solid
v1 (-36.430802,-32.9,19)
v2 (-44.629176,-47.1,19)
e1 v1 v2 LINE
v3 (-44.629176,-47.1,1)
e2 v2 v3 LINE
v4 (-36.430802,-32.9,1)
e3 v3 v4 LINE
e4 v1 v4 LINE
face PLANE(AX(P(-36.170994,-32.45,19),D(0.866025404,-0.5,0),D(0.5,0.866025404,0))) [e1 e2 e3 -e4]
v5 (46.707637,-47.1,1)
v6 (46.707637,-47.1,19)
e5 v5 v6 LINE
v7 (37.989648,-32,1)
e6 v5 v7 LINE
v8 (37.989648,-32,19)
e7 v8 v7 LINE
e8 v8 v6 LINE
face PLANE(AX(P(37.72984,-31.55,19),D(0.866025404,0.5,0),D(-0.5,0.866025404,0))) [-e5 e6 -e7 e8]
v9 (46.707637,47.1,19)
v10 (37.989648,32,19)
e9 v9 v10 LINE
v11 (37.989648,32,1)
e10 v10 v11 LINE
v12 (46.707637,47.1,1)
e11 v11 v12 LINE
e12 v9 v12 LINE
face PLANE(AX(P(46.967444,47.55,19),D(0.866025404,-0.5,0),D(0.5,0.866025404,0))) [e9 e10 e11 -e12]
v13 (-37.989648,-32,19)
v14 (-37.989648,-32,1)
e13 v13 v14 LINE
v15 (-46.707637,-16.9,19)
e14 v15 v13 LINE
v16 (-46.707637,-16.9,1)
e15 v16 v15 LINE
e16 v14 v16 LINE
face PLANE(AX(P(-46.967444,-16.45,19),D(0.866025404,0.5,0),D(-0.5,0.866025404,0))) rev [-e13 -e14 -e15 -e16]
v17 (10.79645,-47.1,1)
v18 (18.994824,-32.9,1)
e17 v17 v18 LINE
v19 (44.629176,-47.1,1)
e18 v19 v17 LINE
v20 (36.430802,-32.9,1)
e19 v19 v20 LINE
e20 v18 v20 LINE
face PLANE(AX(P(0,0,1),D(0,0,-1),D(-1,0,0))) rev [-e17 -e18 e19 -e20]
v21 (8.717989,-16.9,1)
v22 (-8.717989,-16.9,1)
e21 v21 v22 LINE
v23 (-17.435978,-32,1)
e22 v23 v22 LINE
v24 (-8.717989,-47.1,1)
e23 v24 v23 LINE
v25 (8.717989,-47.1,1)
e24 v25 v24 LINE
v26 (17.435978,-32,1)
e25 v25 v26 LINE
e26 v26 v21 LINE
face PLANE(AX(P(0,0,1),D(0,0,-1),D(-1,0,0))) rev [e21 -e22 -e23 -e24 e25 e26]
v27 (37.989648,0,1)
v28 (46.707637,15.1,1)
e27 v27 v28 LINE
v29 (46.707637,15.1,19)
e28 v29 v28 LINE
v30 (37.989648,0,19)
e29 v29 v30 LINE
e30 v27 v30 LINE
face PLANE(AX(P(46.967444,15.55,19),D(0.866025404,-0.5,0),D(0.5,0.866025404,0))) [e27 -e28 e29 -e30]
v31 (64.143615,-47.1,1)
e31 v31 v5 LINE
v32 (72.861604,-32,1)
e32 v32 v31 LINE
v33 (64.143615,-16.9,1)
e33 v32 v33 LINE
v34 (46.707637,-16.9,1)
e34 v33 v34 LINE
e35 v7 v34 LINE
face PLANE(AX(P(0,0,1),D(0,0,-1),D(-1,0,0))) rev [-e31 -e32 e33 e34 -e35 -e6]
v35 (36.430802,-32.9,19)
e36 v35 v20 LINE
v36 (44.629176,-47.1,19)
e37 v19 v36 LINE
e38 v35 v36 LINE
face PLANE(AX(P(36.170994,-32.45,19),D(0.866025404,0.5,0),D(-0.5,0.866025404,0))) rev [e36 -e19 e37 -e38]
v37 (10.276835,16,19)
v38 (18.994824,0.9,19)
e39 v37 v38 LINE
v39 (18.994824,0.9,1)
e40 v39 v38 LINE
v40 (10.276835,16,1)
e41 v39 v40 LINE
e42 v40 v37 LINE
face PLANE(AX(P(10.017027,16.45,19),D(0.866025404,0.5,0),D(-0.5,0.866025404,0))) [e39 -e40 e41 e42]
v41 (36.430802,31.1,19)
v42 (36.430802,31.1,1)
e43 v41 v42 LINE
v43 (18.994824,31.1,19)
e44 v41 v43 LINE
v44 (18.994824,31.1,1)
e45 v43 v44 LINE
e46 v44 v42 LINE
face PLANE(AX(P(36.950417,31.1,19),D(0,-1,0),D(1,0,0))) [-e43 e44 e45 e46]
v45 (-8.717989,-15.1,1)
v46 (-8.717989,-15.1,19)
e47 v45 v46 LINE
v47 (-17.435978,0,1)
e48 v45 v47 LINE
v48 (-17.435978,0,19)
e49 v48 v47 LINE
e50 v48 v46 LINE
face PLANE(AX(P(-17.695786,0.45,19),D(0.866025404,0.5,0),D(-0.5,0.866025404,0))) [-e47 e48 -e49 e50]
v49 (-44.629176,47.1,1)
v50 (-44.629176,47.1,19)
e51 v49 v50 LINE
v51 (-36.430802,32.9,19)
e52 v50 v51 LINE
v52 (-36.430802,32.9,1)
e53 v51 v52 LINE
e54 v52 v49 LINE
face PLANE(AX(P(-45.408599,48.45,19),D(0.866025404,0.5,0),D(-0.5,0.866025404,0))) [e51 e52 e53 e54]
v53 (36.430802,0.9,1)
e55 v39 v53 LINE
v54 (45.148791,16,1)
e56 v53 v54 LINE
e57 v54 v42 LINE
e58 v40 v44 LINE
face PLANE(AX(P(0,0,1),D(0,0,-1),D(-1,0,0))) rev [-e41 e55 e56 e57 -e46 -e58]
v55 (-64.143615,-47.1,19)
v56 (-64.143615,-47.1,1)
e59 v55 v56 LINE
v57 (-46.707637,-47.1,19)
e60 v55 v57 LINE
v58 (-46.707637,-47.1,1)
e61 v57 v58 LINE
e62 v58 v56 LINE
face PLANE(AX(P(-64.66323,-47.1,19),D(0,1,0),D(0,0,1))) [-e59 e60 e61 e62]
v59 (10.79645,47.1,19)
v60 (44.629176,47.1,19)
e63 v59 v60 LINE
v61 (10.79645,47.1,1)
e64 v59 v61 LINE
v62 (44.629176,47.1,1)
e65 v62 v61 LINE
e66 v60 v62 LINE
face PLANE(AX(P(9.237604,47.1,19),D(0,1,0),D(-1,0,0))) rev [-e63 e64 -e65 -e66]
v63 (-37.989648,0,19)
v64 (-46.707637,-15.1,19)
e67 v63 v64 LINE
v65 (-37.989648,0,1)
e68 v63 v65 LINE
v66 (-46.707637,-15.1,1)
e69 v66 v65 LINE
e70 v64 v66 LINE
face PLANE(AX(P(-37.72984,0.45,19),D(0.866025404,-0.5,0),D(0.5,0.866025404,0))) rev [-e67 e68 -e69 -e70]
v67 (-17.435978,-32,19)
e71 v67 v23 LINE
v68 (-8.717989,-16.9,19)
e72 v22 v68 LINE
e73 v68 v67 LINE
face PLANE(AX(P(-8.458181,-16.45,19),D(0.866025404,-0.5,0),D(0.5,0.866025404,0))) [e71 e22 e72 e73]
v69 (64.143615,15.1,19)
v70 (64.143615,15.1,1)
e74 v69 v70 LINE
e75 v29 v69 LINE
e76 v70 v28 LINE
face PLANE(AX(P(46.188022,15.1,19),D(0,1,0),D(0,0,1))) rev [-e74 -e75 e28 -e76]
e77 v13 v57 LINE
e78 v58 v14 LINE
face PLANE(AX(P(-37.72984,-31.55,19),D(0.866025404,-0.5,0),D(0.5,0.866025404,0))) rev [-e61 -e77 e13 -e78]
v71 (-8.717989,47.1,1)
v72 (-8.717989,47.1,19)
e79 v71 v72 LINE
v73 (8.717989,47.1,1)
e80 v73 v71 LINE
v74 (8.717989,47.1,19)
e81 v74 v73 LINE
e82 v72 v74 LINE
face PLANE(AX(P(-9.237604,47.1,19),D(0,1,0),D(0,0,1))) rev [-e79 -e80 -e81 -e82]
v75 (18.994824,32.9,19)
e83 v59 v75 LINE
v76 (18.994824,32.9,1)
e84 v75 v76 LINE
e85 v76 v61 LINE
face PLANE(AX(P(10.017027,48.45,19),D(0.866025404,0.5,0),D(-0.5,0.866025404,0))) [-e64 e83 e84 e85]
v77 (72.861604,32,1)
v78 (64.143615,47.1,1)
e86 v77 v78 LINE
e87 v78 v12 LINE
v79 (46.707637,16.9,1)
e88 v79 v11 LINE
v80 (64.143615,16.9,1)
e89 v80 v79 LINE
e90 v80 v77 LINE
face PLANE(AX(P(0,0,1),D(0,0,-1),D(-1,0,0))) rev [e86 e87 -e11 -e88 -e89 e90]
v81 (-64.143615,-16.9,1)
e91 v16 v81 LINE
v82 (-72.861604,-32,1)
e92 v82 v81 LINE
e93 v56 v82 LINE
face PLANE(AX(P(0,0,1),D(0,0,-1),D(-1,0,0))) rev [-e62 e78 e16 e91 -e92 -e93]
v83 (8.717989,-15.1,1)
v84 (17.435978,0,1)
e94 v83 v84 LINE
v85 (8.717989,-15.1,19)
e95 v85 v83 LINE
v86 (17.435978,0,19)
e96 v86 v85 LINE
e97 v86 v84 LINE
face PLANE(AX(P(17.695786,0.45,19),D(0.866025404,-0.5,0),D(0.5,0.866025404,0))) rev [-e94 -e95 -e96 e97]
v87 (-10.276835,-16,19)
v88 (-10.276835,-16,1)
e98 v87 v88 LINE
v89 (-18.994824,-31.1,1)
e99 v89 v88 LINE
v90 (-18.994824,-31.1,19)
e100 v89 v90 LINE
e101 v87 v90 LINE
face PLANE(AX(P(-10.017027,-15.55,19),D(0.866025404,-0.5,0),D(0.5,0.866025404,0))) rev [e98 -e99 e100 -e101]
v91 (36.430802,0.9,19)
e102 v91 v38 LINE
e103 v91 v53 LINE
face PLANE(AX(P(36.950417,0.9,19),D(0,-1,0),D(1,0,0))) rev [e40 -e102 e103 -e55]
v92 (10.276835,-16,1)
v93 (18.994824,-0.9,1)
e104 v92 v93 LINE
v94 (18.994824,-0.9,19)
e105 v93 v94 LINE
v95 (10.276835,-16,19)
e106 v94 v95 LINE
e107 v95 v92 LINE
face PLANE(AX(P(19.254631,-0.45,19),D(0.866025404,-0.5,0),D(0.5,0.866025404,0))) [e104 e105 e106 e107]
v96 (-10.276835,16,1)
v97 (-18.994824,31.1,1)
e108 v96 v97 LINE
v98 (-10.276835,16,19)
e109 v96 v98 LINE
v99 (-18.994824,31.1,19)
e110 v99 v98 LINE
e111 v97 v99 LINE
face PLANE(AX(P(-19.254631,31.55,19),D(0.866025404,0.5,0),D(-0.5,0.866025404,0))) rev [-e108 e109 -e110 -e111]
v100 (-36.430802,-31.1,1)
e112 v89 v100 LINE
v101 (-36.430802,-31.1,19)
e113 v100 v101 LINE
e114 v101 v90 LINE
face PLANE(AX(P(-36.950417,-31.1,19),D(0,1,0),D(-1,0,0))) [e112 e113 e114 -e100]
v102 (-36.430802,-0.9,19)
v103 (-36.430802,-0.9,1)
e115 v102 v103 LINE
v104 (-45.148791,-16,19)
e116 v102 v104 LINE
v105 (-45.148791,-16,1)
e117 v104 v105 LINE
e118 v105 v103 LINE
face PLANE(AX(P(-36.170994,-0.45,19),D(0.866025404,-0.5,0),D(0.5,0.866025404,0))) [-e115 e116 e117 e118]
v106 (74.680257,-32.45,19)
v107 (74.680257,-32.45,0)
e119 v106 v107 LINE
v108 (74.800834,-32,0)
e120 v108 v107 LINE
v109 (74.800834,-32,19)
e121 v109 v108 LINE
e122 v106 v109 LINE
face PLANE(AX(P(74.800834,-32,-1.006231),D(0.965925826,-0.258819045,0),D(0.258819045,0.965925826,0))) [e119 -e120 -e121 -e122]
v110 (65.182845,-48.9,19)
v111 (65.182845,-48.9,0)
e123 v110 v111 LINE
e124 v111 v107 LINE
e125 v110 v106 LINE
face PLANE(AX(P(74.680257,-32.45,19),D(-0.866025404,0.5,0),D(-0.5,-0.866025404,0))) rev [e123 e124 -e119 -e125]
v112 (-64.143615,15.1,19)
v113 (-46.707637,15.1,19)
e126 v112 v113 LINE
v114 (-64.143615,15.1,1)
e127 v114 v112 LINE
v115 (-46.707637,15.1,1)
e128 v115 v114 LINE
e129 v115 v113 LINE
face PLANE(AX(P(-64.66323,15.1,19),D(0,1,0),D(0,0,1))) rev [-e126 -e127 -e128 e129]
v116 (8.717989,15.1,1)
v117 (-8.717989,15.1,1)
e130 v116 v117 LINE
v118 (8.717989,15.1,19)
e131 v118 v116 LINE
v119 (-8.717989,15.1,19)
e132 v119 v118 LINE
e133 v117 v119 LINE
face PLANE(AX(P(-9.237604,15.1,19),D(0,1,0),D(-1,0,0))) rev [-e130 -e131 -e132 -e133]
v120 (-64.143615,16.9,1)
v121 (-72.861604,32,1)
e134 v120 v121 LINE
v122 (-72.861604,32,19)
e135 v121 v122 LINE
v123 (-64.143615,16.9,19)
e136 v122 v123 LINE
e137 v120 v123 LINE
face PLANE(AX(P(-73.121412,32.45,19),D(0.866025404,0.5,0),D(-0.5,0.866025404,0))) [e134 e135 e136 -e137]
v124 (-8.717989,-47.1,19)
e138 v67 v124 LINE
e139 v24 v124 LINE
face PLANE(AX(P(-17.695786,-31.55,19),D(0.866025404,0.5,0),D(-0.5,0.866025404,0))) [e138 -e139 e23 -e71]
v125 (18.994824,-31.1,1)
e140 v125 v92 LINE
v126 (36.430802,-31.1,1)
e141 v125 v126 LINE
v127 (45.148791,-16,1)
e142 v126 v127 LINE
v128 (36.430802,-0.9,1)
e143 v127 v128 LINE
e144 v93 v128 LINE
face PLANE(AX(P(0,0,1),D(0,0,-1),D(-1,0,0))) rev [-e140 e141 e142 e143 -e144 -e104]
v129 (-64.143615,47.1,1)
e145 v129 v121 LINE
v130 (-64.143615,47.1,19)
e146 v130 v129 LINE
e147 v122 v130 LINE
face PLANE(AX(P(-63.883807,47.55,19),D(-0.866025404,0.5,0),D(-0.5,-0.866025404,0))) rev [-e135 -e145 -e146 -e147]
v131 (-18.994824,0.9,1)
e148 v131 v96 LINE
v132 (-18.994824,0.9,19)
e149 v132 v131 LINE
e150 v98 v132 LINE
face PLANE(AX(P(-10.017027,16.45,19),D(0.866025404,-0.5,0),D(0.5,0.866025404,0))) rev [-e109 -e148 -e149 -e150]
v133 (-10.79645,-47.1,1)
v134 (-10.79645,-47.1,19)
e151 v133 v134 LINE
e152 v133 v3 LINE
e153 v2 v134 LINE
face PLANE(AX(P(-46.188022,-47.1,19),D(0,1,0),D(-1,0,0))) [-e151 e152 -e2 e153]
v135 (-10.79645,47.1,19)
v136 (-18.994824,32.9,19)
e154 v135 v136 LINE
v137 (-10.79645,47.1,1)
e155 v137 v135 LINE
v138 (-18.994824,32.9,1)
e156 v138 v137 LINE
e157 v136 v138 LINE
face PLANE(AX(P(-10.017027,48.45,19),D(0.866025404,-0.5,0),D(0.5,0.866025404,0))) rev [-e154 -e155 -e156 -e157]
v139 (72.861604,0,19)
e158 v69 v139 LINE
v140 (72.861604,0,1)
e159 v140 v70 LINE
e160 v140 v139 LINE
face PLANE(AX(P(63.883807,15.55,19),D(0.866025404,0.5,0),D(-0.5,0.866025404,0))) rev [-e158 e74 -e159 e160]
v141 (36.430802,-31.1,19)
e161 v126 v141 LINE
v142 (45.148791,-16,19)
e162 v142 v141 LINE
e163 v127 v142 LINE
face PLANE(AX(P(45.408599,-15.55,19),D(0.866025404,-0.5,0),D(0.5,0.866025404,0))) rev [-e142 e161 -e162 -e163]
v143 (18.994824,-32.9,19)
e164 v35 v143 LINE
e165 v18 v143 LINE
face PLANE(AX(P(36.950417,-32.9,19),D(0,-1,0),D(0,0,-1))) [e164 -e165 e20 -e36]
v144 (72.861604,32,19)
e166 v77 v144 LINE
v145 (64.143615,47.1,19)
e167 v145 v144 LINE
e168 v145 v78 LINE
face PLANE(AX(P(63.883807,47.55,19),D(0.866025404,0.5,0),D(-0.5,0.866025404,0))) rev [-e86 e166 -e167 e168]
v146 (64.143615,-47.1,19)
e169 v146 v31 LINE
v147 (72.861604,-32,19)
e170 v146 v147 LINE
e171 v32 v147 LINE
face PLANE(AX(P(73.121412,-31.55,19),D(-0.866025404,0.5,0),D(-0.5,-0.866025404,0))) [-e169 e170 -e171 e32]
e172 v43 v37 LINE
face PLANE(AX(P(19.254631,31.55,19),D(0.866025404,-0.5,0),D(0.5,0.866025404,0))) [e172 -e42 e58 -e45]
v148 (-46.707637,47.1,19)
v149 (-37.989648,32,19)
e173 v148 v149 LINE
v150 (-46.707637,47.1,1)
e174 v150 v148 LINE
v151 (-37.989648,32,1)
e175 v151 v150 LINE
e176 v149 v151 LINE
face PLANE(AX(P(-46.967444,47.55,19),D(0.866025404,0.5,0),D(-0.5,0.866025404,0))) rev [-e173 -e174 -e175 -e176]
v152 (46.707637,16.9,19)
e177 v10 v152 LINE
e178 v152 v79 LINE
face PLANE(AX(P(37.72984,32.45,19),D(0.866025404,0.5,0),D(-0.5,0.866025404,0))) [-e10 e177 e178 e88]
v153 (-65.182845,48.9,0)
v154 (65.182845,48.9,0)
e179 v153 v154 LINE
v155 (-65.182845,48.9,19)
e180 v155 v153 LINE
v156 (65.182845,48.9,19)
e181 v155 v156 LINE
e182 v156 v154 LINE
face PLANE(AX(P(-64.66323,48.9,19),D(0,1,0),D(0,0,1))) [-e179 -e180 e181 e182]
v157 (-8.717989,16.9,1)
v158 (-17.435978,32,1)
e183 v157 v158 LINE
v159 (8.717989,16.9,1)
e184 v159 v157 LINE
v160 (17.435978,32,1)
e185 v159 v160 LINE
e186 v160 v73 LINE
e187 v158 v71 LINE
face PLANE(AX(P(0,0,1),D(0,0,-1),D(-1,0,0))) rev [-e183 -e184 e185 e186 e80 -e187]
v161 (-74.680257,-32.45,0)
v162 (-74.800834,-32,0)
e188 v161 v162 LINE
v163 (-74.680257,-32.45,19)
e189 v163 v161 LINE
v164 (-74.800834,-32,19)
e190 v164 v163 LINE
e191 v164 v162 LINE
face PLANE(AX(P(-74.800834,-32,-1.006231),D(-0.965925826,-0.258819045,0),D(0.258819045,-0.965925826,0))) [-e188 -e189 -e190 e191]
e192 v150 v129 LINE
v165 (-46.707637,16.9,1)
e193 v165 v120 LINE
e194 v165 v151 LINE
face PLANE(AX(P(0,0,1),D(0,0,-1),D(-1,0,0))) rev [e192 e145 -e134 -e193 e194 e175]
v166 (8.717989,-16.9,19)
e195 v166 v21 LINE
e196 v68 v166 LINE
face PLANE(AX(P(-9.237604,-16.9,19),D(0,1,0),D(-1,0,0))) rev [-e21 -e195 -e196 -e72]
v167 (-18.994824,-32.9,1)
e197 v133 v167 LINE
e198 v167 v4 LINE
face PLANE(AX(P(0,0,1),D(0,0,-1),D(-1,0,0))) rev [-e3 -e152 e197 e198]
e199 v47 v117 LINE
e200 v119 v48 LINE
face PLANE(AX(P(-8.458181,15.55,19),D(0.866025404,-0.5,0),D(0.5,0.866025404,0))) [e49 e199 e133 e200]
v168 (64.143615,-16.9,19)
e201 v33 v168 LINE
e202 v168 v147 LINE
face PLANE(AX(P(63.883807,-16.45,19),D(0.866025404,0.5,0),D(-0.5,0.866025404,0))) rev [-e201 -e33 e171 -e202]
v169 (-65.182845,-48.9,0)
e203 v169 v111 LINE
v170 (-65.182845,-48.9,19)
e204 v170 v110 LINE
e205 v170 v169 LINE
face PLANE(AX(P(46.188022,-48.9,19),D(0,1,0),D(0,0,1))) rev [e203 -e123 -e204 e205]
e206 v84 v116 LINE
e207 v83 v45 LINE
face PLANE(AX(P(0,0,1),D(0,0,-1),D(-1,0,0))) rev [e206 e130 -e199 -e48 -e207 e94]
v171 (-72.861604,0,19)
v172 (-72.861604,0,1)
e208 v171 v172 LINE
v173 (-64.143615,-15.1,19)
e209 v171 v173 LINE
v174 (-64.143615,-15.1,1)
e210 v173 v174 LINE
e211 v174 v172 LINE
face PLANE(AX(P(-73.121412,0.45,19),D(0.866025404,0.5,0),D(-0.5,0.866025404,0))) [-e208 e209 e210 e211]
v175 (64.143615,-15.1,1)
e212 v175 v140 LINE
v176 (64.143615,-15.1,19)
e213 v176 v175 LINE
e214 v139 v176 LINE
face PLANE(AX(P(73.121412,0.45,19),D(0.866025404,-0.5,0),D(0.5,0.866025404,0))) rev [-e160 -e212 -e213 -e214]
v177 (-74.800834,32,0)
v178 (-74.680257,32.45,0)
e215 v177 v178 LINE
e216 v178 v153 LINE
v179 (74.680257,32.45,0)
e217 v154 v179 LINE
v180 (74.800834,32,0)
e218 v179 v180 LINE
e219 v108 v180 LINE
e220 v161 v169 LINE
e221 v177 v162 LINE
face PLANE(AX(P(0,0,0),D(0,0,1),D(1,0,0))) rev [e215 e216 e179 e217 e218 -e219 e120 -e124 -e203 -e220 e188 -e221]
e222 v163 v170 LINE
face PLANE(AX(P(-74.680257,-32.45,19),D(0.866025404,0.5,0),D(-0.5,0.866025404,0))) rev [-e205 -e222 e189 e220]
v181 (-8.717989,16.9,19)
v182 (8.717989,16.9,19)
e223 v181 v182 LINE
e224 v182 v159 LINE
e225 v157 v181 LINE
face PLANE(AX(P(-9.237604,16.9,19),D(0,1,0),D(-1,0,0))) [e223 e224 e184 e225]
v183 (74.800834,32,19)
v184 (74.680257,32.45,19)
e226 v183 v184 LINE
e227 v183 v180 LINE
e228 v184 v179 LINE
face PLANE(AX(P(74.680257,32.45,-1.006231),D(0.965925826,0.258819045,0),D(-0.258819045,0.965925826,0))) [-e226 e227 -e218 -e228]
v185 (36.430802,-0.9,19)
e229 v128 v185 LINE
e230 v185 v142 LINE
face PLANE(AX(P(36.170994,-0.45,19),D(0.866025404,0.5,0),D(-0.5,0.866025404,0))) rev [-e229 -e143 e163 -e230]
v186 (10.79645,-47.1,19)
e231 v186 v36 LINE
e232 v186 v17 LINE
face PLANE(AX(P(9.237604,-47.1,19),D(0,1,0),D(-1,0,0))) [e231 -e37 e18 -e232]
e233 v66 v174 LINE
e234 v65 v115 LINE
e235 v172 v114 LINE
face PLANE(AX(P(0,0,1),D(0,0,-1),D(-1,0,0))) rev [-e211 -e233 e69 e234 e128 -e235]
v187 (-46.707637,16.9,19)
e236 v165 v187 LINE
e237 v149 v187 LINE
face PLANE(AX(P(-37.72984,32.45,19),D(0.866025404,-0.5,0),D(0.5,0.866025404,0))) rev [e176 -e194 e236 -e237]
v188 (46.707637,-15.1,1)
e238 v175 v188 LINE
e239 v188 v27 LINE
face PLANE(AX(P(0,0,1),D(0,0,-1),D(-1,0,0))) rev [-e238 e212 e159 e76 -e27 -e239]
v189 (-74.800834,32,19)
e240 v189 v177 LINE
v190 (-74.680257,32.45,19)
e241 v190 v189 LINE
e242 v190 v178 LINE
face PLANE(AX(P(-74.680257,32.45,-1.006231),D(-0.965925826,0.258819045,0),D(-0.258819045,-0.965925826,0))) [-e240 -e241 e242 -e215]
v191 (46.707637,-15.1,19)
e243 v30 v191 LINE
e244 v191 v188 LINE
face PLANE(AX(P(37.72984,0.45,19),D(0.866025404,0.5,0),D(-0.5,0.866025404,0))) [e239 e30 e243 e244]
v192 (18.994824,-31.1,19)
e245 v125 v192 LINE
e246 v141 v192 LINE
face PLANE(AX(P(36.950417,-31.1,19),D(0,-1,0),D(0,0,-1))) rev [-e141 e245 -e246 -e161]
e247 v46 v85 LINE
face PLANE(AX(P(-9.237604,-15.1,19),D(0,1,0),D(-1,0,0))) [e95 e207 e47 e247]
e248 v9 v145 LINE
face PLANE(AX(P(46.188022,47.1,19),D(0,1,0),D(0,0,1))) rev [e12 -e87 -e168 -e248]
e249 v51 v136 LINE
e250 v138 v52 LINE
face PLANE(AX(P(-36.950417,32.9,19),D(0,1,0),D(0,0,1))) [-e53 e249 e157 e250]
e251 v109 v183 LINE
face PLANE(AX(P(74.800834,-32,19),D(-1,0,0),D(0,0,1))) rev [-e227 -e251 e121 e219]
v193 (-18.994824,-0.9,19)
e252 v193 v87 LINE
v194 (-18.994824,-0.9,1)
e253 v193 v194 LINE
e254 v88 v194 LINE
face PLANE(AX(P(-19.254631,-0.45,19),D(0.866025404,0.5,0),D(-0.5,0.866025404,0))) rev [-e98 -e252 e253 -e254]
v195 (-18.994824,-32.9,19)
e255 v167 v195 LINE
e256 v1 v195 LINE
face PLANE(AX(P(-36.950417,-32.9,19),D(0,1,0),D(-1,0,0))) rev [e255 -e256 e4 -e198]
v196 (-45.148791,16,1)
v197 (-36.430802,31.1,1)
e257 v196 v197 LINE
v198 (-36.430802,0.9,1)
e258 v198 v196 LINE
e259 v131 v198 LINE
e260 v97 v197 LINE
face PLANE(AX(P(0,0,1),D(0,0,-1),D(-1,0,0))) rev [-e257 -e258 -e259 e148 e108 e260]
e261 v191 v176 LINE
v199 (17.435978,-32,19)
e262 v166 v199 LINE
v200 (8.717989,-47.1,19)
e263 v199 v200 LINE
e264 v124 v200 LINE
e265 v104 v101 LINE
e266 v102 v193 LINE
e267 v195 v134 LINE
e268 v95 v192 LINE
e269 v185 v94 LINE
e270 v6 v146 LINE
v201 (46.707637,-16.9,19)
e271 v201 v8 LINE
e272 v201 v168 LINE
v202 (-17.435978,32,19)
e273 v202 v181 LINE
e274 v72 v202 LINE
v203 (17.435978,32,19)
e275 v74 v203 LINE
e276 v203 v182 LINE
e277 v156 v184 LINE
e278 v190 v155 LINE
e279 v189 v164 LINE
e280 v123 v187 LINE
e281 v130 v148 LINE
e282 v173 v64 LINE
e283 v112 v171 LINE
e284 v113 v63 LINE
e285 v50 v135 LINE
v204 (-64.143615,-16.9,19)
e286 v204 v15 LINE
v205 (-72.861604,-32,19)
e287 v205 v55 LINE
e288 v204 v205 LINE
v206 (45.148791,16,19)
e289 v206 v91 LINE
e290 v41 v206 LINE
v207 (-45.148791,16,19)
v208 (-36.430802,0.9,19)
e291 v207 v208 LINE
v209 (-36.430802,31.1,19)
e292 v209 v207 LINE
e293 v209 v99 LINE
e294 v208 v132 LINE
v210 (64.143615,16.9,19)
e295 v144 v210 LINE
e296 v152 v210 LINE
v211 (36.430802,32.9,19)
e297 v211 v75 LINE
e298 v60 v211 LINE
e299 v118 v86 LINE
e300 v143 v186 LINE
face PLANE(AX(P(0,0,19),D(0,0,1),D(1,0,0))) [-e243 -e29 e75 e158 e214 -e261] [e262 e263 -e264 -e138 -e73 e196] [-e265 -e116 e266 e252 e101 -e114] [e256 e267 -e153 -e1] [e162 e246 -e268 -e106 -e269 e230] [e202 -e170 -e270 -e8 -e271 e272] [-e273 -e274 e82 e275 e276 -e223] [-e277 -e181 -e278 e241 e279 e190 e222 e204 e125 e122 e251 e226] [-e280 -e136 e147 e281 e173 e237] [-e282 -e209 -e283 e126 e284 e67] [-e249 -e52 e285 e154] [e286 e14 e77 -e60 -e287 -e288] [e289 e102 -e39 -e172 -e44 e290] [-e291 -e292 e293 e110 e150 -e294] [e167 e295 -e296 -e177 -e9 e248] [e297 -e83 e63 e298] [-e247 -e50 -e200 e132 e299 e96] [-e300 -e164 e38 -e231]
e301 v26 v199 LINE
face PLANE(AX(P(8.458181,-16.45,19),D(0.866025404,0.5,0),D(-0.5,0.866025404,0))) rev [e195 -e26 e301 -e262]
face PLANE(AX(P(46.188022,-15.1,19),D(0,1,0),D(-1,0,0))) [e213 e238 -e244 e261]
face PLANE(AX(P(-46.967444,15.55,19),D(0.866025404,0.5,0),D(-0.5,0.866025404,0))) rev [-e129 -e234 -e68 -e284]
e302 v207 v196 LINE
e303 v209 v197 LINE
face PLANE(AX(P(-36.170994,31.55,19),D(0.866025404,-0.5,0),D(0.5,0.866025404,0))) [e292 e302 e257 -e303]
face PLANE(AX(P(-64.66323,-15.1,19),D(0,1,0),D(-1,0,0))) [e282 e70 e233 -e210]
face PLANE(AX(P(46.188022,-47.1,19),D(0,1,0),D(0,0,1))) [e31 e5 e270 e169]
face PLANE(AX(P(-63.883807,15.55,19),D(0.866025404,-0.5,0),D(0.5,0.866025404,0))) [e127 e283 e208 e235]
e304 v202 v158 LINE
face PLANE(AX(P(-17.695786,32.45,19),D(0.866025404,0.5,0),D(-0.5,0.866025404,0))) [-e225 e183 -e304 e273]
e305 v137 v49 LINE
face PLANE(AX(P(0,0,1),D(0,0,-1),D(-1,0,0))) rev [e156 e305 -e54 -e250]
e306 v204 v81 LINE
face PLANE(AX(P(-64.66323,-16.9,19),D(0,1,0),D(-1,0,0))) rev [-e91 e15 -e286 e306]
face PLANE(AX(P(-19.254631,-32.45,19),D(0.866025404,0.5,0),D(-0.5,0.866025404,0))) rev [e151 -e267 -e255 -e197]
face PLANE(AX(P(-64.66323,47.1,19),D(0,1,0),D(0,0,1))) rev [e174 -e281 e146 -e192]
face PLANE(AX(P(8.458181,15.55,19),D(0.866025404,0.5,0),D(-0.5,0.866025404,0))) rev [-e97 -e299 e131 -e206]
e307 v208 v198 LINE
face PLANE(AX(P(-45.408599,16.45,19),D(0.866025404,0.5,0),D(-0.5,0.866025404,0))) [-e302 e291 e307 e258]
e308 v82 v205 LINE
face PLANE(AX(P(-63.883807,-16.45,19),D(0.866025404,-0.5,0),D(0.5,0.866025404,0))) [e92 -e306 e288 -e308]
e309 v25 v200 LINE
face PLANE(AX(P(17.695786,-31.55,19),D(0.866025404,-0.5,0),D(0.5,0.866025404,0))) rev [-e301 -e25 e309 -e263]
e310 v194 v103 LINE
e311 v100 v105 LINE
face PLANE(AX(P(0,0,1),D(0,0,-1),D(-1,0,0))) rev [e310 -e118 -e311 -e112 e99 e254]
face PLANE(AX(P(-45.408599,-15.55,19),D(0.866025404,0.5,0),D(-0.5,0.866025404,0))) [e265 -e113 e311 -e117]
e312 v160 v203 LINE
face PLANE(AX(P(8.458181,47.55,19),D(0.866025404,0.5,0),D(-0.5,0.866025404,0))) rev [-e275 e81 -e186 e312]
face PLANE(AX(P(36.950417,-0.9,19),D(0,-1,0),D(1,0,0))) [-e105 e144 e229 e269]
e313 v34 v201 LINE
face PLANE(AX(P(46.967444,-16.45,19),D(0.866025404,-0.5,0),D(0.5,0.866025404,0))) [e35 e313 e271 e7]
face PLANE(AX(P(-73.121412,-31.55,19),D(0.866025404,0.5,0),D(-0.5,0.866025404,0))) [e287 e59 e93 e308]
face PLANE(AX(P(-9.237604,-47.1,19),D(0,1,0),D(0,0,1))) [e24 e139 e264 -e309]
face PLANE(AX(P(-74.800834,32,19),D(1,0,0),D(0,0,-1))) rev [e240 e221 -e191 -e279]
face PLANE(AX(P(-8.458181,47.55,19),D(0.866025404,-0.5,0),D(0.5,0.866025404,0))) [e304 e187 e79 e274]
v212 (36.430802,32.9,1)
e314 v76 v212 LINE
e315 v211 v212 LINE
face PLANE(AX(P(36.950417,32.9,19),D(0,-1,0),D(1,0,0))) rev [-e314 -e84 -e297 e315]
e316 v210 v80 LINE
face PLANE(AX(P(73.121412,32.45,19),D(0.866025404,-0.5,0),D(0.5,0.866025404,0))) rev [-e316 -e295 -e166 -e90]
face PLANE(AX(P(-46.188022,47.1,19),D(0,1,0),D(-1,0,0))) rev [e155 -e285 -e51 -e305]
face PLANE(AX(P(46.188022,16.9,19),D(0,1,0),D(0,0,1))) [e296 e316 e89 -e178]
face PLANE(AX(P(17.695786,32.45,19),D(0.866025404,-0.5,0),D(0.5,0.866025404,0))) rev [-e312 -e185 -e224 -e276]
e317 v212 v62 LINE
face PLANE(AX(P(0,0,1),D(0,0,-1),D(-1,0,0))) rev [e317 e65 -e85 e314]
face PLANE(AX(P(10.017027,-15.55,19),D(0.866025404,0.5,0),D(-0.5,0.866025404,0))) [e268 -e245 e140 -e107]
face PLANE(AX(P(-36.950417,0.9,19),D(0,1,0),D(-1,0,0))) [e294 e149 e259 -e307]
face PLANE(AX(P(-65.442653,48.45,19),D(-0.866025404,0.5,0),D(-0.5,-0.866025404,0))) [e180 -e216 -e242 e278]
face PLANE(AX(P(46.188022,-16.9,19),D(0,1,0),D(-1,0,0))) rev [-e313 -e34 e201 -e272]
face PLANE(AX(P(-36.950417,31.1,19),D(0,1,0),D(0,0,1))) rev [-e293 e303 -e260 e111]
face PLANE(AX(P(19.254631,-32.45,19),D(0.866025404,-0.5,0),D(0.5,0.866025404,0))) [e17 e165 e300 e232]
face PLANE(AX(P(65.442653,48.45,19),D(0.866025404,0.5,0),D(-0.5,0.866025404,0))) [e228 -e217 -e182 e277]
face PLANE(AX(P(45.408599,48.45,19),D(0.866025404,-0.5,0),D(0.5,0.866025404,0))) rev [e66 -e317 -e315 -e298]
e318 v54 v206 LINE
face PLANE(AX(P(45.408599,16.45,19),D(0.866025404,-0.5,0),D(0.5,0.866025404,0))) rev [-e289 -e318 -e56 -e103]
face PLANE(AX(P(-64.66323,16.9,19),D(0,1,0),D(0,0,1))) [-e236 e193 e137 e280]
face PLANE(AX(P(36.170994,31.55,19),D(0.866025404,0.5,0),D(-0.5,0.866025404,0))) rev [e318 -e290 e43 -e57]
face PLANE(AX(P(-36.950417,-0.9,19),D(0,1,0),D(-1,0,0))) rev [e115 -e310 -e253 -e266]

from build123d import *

# Parameters (mm, degrees)
EXTRUDE_THIN2_DEPTH = 19
BOSS_EXTRUDE1_DEPTH = 19
BOSS_EXTRUDE2_DEPTH = 1
BOSS_EXTRUDE4_DEPTH = 18


# Read off the part's stored shape, not the designer's step: Extrude-Thin2
with BuildPart() as part:
    # Extrude-Thin2 outline → Extrude-Thin2 (new body)
    with BuildSketch(Plane.XY):
        Polygon((-74.68025732, 32.45), (-73.900834456, 32), (-74.800834456, 32), (-74.800834456, -32), (-73.900834456, -32), (-74.68025732, -32.45), (-65.182845391, -48.9), (65.182845392, -48.9), (74.68025732, -32.45), (73.900834456, -32), (74.800834456, -32), (74.800834456, 32), (73.900834456, 32), (74.68025732, 32.45), (65.182845392, 48.9), (-65.182845392, 48.9), align=None)
        Polygon((-37.989647713, -32), (-46.707636777, -47.1), (-64.143614907, -47.1), (-72.861603972, -32), (-64.143614907, -16.9), (-46.707636777, -16.9), align=None, mode=Mode.SUBTRACT)
        Polygon((-36.430801986, -32.9), (-18.994823856, -32.9), (-10.796450034, -47.1), (-44.629175808, -47.1), align=None, mode=Mode.SUBTRACT)
        Polygon((-73.000834456, -3.358845727), (-65.702460634, -16), (-73.000834456, -28.641154273), align=None, mode=Mode.SUBTRACT)
        Polygon((-10.276834792, -16), (-18.994823856, -31.1), (-36.430801986, -31.1), (-45.148791051, -16), (-36.430801986, -0.9), (-18.994823856, -0.9), align=None, mode=Mode.SUBTRACT)
        Polygon((10.796450034, -47.1), (18.994823856, -32.9), (36.430801986, -32.9), (44.629175808, -47.1), align=None, mode=Mode.SUBTRACT)
        Polygon((-8.717989065, -16.9), (8.717989065, -16.9), (17.43597813, -32), (8.717989065, -47.1), (-8.717989065, -47.1), (-17.435978129, -32), align=None, mode=Mode.SUBTRACT)
        Polygon((46.707636777, -16.9), (64.143614907, -16.9), (72.861603972, -32), (64.143614907, -47.1), (46.707636777, -47.1), (37.989647713, -32), align=None, mode=Mode.SUBTRACT)
        Polygon((36.430801986, -0.9), (45.148791051, -16), (36.430801986, -31.1), (18.994823856, -31.1), (10.276834792, -16), (18.994823856, -0.9), align=None, mode=Mode.SUBTRACT)
        Polygon((73.000834456, -28.641154273), (65.702460634, -16), (73.000834456, -3.358845727), align=None, mode=Mode.SUBTRACT)
        Polygon((-37.989647713, 0), (-46.707636777, -15.1), (-64.143614907, -15.1), (-72.861603972, 0), (-64.143614907, 15.1), (-46.707636777, 15.1), align=None, mode=Mode.SUBTRACT)
        Polygon((-65.702460634, 16), (-73.000834456, 3.358845727), (-73.000834456, 28.641154273), align=None, mode=Mode.SUBTRACT)
        Polygon((-10.276834792, 16), (-18.994823856, 0.9), (-36.430801986, 0.9), (-45.148791051, 16), (-36.430801986, 31.1), (-18.994823856, 31.1), align=None, mode=Mode.SUBTRACT)
        Polygon((-37.989647713, 32), (-46.707636777, 16.9), (-64.143614907, 16.9), (-72.861603972, 32), (-64.143614907, 47.1), (-46.707636777, 47.1), align=None, mode=Mode.SUBTRACT)
        Polygon((-10.796450034, 47.1), (-18.994823856, 32.9), (-36.430801986, 32.9), (-44.629175808, 47.1), align=None, mode=Mode.SUBTRACT)
        Polygon((17.43597813, 0), (8.717989065, -15.1), (-8.717989065, -15.1), (-17.43597813, 0), (-8.717989065, 15.1), (8.717989065, 15.1), align=None, mode=Mode.SUBTRACT)
        Polygon((36.430801986, 0.9), (18.994823856, 0.9), (10.276834792, 16), (18.994823856, 31.1), (36.430801986, 31.1), (45.148791051, 16), align=None, mode=Mode.SUBTRACT)
        Polygon((72.861603972, 0), (64.143614907, -15.1), (46.707636777, -15.1), (37.989647713, 0), (46.707636777, 15.1), (64.143614907, 15.1), align=None, mode=Mode.SUBTRACT)
        Polygon((73.000834456, 28.641154273), (73.000834456, 3.358845727), (65.702460634, 16), align=None, mode=Mode.SUBTRACT)
        Polygon((17.43597813, 32), (8.717989065, 16.9), (-8.717989065, 16.9), (-17.43597813, 32), (-8.717989065, 47.1), (8.717989065, 47.1), align=None, mode=Mode.SUBTRACT)
        Polygon((36.430801986, 32.9), (18.994823856, 32.9), (10.796450034, 47.1), (44.629175808, 47.1), align=None, mode=Mode.SUBTRACT)
        Polygon((72.861603972, 32), (64.143614907, 16.9), (46.707636777, 16.9), (37.989647713, 32), (46.707636777, 47.1), (64.143614907, 47.1), align=None, mode=Mode.SUBTRACT)
    extrude(amount=EXTRUDE_THIN2_DEPTH)

    # Sketch2 → Boss-Extrude1 (add)
    with BuildSketch(Plane.XY.offset(19)):
        Polygon((73.900834456, -32), (74.68025732, -32.45), (74.800834456, -32), align=None)
        Polygon((74.68025732, 32.45), (74.800834456, 32), (73.900834456, 32), align=None)
        Polygon((-74.68025732, 32.45), (-74.800834456, 32), (-73.900834456, 32), align=None)
        Polygon((-74.68025732, -32.45), (-73.900834456, -32), (-74.800834456, -32), align=None)
    extrude(amount=-BOSS_EXTRUDE1_DEPTH)

    # Sketch3 → Boss-Extrude2 (add)
    with BuildSketch(Plane(origin=(0, 0, 0), x_dir=(-1, 0, 0), z_dir=(0, 0, -1))):
        Polygon((-74.68025732, 32.45), (-74.800834456, 32), (-74.800834456, -32), (-74.68025732, -32.45), (-65.182845392, -48.9), (65.182845391, -48.9), (74.68025732, -32.45), (74.800834456, -32), (74.800834456, 32), (74.68025732, 32.45), (65.182845392, 48.9), (-65.182845392, 48.9), align=None)
    extrude(amount=-BOSS_EXTRUDE2_DEPTH)

    # Sketch5 → Boss-Extrude4 (add)
    with BuildSketch(Plane.XY.offset(1)):
        Polygon((-73.000834456, 28.641154273), (-73.000834456, 3.358845727), (-65.702460634, 16), align=None)
        Polygon((-73.000834456, -28.641154273), (-65.702460634, -16), (-73.000834456, -3.358845727), align=None)
        Polygon((65.702460634, 16), (73.000834456, 3.358845727), (73.000834456, 28.641154273), align=None)
        Polygon((73.000834456, -3.358845727), (65.702460634, -16), (73.000834456, -28.641154273), align=None)
    extrude(amount=BOSS_EXTRUDE4_DEPTH)


solid = part.part
